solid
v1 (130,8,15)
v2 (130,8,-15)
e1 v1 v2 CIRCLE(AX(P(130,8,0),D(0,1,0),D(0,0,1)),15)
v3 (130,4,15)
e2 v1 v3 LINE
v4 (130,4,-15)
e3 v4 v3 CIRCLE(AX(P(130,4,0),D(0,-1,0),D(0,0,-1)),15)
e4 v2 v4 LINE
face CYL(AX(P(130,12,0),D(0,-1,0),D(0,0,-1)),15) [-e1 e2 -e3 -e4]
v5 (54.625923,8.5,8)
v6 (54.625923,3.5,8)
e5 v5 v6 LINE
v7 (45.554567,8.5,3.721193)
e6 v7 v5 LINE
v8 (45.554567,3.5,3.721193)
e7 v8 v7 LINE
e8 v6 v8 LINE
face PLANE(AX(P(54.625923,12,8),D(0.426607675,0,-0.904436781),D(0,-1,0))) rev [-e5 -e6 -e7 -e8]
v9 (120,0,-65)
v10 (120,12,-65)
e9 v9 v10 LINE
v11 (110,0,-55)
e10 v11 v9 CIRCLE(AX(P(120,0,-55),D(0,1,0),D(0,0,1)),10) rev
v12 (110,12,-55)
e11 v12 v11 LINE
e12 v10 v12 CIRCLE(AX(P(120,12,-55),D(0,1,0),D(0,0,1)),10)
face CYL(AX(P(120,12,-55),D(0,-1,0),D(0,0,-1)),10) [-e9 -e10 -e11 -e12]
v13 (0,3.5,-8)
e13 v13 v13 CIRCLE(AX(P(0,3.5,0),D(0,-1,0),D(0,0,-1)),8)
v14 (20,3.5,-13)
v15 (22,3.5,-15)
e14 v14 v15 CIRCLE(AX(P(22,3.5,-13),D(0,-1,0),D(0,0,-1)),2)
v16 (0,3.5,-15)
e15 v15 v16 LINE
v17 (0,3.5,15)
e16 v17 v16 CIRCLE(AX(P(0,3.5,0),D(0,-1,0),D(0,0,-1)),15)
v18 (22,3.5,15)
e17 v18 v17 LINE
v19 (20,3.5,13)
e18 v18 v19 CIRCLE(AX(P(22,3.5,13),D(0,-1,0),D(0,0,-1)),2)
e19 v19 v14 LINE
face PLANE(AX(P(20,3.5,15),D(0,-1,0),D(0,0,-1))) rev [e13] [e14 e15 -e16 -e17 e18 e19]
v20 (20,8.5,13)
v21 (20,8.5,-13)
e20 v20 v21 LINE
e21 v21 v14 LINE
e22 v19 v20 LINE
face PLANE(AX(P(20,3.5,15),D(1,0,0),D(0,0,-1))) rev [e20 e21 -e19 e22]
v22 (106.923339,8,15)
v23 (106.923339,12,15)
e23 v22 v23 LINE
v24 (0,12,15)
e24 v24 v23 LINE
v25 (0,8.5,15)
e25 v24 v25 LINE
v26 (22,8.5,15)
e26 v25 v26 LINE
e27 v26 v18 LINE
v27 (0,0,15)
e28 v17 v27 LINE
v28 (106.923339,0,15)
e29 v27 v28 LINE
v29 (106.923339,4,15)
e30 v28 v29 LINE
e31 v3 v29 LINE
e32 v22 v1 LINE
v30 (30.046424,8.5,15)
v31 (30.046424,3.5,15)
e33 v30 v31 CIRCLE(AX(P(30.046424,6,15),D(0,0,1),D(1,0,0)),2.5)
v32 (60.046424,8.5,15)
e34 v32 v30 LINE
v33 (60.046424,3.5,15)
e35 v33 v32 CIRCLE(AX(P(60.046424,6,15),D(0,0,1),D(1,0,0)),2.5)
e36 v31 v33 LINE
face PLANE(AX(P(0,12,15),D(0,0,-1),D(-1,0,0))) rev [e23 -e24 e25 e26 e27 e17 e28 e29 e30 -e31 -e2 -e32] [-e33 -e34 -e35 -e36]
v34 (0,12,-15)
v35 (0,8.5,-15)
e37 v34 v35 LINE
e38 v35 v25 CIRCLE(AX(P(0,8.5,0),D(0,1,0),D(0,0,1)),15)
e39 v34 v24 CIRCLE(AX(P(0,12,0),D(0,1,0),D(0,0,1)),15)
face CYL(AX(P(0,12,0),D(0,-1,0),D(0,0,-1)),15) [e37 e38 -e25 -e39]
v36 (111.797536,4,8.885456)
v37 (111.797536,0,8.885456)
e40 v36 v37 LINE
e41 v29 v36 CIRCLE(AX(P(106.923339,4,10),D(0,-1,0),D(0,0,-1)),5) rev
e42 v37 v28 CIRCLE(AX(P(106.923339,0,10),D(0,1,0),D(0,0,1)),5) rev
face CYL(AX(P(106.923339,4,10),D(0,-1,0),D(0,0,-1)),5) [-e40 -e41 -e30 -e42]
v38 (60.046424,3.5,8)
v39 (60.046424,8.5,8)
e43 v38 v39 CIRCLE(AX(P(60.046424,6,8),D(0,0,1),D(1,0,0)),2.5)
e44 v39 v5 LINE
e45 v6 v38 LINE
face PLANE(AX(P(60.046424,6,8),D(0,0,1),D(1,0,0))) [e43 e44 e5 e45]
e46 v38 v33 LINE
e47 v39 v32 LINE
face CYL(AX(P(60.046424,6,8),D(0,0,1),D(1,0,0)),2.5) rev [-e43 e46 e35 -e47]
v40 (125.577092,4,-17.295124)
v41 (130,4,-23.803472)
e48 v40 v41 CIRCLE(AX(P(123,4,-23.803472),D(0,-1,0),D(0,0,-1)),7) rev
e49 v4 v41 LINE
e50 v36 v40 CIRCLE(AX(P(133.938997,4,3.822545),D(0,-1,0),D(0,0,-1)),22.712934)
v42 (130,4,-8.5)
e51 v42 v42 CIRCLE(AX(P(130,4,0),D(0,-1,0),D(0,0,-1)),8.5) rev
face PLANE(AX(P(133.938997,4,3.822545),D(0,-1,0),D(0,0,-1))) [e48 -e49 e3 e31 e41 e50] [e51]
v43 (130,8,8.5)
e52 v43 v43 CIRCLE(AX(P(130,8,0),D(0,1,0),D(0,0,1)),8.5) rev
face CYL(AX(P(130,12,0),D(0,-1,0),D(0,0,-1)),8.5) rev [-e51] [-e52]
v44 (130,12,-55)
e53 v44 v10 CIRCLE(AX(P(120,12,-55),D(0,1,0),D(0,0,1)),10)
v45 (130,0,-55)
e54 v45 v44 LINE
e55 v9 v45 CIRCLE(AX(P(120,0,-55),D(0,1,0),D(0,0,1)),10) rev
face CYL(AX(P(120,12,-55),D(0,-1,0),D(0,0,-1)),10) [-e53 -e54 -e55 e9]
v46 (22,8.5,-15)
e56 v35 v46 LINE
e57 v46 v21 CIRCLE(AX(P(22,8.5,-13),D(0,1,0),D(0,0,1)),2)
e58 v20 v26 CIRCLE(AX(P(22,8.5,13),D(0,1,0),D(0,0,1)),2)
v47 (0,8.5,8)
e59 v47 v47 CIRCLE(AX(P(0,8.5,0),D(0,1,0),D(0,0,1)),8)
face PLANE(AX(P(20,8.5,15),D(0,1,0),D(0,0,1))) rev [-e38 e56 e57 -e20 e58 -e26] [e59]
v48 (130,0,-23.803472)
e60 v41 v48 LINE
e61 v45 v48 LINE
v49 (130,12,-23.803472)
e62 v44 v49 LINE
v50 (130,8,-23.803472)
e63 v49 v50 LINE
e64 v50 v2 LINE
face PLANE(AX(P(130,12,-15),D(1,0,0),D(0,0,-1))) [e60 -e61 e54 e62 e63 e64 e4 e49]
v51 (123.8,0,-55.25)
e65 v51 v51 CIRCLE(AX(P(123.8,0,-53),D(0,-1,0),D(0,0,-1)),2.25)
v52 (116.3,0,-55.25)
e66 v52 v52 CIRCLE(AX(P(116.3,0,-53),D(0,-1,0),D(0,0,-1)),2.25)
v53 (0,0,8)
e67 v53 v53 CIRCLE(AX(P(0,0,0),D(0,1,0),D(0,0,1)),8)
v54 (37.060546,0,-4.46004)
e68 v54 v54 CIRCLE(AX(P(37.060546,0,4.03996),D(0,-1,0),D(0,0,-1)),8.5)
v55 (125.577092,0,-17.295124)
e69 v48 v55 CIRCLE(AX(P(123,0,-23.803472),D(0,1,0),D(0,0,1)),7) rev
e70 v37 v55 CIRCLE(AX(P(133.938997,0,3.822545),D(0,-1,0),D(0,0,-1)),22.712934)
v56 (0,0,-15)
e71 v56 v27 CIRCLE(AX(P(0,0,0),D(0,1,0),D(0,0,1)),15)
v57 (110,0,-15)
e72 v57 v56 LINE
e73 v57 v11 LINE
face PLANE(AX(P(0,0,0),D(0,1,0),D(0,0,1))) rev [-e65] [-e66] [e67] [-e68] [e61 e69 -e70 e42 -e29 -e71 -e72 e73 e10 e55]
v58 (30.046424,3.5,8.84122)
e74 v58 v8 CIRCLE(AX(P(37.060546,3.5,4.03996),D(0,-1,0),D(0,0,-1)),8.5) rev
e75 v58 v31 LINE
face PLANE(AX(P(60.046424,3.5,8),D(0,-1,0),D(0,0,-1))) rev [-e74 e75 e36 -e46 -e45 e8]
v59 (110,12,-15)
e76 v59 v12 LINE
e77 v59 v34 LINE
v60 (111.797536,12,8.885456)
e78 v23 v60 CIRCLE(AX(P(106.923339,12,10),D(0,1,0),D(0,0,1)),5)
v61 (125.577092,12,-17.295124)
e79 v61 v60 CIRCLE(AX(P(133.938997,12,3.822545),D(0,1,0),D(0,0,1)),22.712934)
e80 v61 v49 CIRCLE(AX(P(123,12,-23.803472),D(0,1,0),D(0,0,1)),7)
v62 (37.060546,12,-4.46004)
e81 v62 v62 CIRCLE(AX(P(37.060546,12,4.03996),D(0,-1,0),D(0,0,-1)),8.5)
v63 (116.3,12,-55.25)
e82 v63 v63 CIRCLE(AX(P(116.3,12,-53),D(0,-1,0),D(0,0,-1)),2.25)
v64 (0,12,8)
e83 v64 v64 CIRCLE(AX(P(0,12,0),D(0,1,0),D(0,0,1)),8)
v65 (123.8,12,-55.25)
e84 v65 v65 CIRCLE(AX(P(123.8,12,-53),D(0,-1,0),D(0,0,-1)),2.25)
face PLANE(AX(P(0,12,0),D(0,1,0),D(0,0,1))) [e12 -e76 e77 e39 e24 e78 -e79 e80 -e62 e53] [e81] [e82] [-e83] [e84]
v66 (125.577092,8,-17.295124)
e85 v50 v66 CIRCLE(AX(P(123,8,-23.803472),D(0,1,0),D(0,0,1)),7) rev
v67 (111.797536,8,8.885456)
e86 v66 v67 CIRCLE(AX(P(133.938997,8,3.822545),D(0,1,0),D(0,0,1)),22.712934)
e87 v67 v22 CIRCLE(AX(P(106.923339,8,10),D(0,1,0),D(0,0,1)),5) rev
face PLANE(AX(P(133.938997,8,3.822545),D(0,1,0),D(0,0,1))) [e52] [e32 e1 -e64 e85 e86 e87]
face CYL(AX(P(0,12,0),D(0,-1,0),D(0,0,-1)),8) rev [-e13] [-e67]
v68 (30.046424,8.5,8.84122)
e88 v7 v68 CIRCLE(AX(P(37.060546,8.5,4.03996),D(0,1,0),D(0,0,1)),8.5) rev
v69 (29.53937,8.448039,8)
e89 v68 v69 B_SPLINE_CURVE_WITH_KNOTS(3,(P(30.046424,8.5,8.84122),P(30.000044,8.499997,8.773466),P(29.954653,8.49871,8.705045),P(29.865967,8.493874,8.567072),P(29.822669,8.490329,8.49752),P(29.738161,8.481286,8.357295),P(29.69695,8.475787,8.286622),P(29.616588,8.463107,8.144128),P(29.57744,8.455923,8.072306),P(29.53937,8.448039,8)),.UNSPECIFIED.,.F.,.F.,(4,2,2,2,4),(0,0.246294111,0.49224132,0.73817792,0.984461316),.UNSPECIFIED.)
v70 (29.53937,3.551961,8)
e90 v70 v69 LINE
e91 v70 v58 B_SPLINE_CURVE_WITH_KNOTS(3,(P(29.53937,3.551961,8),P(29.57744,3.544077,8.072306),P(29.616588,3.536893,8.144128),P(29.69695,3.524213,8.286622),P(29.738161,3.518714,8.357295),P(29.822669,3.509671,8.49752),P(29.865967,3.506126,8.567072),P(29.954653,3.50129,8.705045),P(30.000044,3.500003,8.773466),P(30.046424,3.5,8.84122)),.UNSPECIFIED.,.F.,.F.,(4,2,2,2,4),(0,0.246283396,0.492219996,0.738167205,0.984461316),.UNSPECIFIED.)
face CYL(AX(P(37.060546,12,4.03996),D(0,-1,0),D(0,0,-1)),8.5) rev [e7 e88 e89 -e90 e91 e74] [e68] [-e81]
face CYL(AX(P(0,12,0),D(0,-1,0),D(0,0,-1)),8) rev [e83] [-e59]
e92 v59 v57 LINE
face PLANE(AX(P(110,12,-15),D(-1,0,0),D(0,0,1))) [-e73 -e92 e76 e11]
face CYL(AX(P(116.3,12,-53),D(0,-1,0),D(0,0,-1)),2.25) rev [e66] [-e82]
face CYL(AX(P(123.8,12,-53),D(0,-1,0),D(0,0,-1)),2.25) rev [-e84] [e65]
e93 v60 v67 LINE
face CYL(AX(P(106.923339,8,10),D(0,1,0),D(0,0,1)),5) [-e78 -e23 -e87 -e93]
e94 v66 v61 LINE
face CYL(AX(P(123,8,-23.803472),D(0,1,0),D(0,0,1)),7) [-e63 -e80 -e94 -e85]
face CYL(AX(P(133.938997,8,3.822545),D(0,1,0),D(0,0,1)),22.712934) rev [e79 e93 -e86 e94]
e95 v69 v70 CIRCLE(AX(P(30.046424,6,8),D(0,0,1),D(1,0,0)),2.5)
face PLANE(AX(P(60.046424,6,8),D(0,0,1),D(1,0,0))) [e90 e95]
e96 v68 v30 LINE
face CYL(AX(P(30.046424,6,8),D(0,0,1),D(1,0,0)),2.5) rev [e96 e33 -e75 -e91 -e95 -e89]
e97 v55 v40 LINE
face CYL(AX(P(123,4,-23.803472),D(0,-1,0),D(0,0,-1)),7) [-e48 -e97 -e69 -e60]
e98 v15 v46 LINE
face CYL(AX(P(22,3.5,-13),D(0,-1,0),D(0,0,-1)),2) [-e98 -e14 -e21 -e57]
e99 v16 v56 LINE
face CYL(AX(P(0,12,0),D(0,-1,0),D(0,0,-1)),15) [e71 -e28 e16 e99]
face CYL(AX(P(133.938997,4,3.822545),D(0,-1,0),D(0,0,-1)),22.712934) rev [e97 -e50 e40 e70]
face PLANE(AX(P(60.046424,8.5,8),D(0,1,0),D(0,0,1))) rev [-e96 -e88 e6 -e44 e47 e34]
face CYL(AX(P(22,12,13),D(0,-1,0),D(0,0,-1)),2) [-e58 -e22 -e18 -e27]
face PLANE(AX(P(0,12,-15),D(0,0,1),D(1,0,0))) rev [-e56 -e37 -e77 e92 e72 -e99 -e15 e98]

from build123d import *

# Parameters (mm, degrees)
SKETCH1_R           = 8
BOSS_EXTRUDE1_DEPTH = 12
SKETCH3_W           = 35
SKETCH3_H           = 5
CUT_EXTRUDE1_DEPTH  = 30
SKETCH4_W           = 20
SKETCH4_H           = 50
BOSS_EXTRUDE2_DEPTH = 12
FILLET1_R           = 10
FILLET2_R           = 10
SKETCH7_R           = 8.5
CUT_EXTRUDE4_DEPTH  = 12
SKETCH8_R           = 22.712934263
CUT_EXTRUDE5_DEPTH  = 4
CUT_EXTRUDE6_START  = -4
SKETCH9_R           = 22.712934263
CUT_EXTRUDE6_DEPTH  = 4
SKETCH14_R          = 2.25
CUT_EXTRUDE7_DEPTH  = 12
FILLET3_R           = 5
FILLET4_R           = 5
SKETCH15_R          = 8.5
CUT_EXTRUDE8_DEPTH  = 12
CUT_EXTRUDE9_DEPTH  = 7
CHAMFER1_START      = 3.5
CHAMFER1_DEPTH      = 5
FILLET6_R           = 7
FILLET7_R           = 7
FILLET9_R           = 2
FILLET10_R          = 2


with BuildPart() as part:
    # Sketch1 → Boss-Extrude1 (new body)
    with BuildSketch(Plane(origin=(0, 0, 0), x_dir=(1, 0, 0), z_dir=(0, 1, 0))):
        with BuildLine():
            Line((0, 15), (130, 15))
            ThreePointArc((130, 15), (145, 0), (130, -15))
            Line((130, -15), (0, -15))
            ThreePointArc((0, -15), (-15, 0), (0, 15))
        make_face()
        with Locations(Location((0, 0, 0), (0, 0, 270))):
            Circle(SKETCH1_R, mode=Mode.SUBTRACT)
    extrude(amount=BOSS_EXTRUDE1_DEPTH)

    # Sketch3 → Cut-Extrude1 (cut)
    with BuildSketch(Plane(origin=(0, 0, -15), x_dir=(-1, 0, 0), z_dir=(0, 0, -1))):
        with Locations((-2.5, 6)):
            Rectangle(SKETCH3_W, SKETCH3_H)
    extrude(amount=-CUT_EXTRUDE1_DEPTH, mode=Mode.SUBTRACT)

    # Sketch4 → Boss-Extrude2 (add)
    with BuildSketch(Plane.XZ):
        with Locations((120, -40)):
            Rectangle(SKETCH4_W, SKETCH4_H)
    extrude(amount=-BOSS_EXTRUDE2_DEPTH)

    # Fillet1
    fillet1_edges = [part.edges().sort_by_distance(p)[0] for p in [
        (110, 6, -65),
    ]]
    fillet(fillet1_edges, radius=FILLET1_R)

    # Fillet2
    fillet2_edges = [part.edges().sort_by_distance(p)[0] for p in [
        (130, 6, -65),
    ]]
    fillet(fillet2_edges, radius=FILLET2_R - 0.0001)  # a hair under: the kernel refuses the full size

    # Sketch7 → Cut-Extrude4 (cut)
    with BuildSketch(Plane.XZ):
        with Locations(Location((130, 0, 0), (0, 0, 270))):
            Circle(SKETCH7_R)
    extrude(amount=-CUT_EXTRUDE4_DEPTH, mode=Mode.SUBTRACT)

    # Sketch8 → Cut-Extrude5 (cut)
    with BuildSketch(Plane(origin=(0, 12, 0), x_dir=(1, 0, 0), z_dir=(0, 1, 0))):
        with Locations((133.938996952, -3.822545113)):
            Circle(SKETCH8_R)
    extrude(amount=-CUT_EXTRUDE5_DEPTH, mode=Mode.SUBTRACT)

    # Sketch9 → Cut-Extrude6 (cut)
    with BuildSketch(Plane.XZ.offset(CUT_EXTRUDE6_START)):
        with Locations((133.938996952, 3.822545113)):
            Circle(SKETCH9_R)
    extrude(amount=CUT_EXTRUDE6_DEPTH, mode=Mode.SUBTRACT)

    # Sketch14 → Cut-Extrude7 (cut)
    with BuildSketch(Plane.XZ):
        with Locations(Location((116.3, -53, 0), (0, 0, 270))):
            Circle(SKETCH14_R)
        with Locations(Location((123.8, -53, 0), (0, 0, 270))):
            Circle(SKETCH14_R)
    extrude(amount=-CUT_EXTRUDE7_DEPTH, mode=Mode.SUBTRACT)

    # Fillet3
    fillet3_edges = [part.edges().sort_by_distance(p)[0] for p in [
        (114.166746572, 10, 15),
    ]]
    fillet(fillet3_edges, radius=FILLET3_R)

    # Fillet4
    fillet4_edges = [part.edges().sort_by_distance(p)[0] for p in [
        (114.166746572, 2, 15),
    ]]
    fillet(fillet4_edges, radius=FILLET4_R)

    # Sketch15 → Cut-Extrude8 (cut)
    with BuildSketch(Plane.XZ):
        with Locations(Location((37.060545973, 4.039960241, 0), (0, 0, 270))):
            Circle(SKETCH15_R)
    extrude(amount=-CUT_EXTRUDE8_DEPTH, mode=Mode.SUBTRACT)

    # Sketch16 → Cut-Extrude9 (cut)
    with BuildSketch(Plane.XY.offset(15)):
        with BuildLine():
            Line((60.046424392, 3.5), (30.046424392, 3.5))
            ThreePointArc((30.046424392, 3.5), (27.546424392, 6), (30.046424392, 8.5))
            Line((30.046424392, 8.5), (60.046424392, 8.5))
            ThreePointArc((60.046424392, 8.5), (62.546424392, 6), (60.046424392, 3.5))
        make_face()
    extrude(amount=-CUT_EXTRUDE9_DEPTH, mode=Mode.SUBTRACT)

    # Chamfer1: read off the stored shape, not the designer's step
    # Chamfer1 outline → Chamfer1 (cut)
    with BuildSketch(Plane(origin=(0, 0, 0), x_dir=(1, 0, 0), z_dir=(0, 1, 0)).offset(CHAMFER1_START)):
        with BuildLine():
            Line((44.581721752, -8), (54.625922679, -8))
            Line((54.625922679, -8), (45.554566675, -3.721193369))
            ThreePointArc((45.554566675, -3.721193369), (45.349012425, -5.924455895), (44.581721752, -8))
        make_face()
    extrude(amount=CHAMFER1_DEPTH, mode=Mode.SUBTRACT)

    # Fillet6
    fillet6_edges = [part.edges().sort_by_distance(p)[0] for p in [
        (130, 2, -18.546220742),
    ]]
    fillet(fillet6_edges, radius=FILLET6_R)

    # Fillet7
    fillet7_edges = [part.edges().sort_by_distance(p)[0] for p in [
        (130, 10, -18.546220742),
    ]]
    fillet(fillet7_edges, radius=FILLET7_R)

    # Fillet9
    fillet9_edges = [part.edges().sort_by_distance(p)[0] for p in [
        (20, 6, -15),
    ]]
    fillet(fillet9_edges, radius=FILLET9_R)

    # Fillet10
    fillet10_edges = [part.edges().sort_by_distance(p)[0] for p in [
        (20, 6, 15),
    ]]
    fillet(fillet10_edges, radius=FILLET10_R)


solid = part.part
